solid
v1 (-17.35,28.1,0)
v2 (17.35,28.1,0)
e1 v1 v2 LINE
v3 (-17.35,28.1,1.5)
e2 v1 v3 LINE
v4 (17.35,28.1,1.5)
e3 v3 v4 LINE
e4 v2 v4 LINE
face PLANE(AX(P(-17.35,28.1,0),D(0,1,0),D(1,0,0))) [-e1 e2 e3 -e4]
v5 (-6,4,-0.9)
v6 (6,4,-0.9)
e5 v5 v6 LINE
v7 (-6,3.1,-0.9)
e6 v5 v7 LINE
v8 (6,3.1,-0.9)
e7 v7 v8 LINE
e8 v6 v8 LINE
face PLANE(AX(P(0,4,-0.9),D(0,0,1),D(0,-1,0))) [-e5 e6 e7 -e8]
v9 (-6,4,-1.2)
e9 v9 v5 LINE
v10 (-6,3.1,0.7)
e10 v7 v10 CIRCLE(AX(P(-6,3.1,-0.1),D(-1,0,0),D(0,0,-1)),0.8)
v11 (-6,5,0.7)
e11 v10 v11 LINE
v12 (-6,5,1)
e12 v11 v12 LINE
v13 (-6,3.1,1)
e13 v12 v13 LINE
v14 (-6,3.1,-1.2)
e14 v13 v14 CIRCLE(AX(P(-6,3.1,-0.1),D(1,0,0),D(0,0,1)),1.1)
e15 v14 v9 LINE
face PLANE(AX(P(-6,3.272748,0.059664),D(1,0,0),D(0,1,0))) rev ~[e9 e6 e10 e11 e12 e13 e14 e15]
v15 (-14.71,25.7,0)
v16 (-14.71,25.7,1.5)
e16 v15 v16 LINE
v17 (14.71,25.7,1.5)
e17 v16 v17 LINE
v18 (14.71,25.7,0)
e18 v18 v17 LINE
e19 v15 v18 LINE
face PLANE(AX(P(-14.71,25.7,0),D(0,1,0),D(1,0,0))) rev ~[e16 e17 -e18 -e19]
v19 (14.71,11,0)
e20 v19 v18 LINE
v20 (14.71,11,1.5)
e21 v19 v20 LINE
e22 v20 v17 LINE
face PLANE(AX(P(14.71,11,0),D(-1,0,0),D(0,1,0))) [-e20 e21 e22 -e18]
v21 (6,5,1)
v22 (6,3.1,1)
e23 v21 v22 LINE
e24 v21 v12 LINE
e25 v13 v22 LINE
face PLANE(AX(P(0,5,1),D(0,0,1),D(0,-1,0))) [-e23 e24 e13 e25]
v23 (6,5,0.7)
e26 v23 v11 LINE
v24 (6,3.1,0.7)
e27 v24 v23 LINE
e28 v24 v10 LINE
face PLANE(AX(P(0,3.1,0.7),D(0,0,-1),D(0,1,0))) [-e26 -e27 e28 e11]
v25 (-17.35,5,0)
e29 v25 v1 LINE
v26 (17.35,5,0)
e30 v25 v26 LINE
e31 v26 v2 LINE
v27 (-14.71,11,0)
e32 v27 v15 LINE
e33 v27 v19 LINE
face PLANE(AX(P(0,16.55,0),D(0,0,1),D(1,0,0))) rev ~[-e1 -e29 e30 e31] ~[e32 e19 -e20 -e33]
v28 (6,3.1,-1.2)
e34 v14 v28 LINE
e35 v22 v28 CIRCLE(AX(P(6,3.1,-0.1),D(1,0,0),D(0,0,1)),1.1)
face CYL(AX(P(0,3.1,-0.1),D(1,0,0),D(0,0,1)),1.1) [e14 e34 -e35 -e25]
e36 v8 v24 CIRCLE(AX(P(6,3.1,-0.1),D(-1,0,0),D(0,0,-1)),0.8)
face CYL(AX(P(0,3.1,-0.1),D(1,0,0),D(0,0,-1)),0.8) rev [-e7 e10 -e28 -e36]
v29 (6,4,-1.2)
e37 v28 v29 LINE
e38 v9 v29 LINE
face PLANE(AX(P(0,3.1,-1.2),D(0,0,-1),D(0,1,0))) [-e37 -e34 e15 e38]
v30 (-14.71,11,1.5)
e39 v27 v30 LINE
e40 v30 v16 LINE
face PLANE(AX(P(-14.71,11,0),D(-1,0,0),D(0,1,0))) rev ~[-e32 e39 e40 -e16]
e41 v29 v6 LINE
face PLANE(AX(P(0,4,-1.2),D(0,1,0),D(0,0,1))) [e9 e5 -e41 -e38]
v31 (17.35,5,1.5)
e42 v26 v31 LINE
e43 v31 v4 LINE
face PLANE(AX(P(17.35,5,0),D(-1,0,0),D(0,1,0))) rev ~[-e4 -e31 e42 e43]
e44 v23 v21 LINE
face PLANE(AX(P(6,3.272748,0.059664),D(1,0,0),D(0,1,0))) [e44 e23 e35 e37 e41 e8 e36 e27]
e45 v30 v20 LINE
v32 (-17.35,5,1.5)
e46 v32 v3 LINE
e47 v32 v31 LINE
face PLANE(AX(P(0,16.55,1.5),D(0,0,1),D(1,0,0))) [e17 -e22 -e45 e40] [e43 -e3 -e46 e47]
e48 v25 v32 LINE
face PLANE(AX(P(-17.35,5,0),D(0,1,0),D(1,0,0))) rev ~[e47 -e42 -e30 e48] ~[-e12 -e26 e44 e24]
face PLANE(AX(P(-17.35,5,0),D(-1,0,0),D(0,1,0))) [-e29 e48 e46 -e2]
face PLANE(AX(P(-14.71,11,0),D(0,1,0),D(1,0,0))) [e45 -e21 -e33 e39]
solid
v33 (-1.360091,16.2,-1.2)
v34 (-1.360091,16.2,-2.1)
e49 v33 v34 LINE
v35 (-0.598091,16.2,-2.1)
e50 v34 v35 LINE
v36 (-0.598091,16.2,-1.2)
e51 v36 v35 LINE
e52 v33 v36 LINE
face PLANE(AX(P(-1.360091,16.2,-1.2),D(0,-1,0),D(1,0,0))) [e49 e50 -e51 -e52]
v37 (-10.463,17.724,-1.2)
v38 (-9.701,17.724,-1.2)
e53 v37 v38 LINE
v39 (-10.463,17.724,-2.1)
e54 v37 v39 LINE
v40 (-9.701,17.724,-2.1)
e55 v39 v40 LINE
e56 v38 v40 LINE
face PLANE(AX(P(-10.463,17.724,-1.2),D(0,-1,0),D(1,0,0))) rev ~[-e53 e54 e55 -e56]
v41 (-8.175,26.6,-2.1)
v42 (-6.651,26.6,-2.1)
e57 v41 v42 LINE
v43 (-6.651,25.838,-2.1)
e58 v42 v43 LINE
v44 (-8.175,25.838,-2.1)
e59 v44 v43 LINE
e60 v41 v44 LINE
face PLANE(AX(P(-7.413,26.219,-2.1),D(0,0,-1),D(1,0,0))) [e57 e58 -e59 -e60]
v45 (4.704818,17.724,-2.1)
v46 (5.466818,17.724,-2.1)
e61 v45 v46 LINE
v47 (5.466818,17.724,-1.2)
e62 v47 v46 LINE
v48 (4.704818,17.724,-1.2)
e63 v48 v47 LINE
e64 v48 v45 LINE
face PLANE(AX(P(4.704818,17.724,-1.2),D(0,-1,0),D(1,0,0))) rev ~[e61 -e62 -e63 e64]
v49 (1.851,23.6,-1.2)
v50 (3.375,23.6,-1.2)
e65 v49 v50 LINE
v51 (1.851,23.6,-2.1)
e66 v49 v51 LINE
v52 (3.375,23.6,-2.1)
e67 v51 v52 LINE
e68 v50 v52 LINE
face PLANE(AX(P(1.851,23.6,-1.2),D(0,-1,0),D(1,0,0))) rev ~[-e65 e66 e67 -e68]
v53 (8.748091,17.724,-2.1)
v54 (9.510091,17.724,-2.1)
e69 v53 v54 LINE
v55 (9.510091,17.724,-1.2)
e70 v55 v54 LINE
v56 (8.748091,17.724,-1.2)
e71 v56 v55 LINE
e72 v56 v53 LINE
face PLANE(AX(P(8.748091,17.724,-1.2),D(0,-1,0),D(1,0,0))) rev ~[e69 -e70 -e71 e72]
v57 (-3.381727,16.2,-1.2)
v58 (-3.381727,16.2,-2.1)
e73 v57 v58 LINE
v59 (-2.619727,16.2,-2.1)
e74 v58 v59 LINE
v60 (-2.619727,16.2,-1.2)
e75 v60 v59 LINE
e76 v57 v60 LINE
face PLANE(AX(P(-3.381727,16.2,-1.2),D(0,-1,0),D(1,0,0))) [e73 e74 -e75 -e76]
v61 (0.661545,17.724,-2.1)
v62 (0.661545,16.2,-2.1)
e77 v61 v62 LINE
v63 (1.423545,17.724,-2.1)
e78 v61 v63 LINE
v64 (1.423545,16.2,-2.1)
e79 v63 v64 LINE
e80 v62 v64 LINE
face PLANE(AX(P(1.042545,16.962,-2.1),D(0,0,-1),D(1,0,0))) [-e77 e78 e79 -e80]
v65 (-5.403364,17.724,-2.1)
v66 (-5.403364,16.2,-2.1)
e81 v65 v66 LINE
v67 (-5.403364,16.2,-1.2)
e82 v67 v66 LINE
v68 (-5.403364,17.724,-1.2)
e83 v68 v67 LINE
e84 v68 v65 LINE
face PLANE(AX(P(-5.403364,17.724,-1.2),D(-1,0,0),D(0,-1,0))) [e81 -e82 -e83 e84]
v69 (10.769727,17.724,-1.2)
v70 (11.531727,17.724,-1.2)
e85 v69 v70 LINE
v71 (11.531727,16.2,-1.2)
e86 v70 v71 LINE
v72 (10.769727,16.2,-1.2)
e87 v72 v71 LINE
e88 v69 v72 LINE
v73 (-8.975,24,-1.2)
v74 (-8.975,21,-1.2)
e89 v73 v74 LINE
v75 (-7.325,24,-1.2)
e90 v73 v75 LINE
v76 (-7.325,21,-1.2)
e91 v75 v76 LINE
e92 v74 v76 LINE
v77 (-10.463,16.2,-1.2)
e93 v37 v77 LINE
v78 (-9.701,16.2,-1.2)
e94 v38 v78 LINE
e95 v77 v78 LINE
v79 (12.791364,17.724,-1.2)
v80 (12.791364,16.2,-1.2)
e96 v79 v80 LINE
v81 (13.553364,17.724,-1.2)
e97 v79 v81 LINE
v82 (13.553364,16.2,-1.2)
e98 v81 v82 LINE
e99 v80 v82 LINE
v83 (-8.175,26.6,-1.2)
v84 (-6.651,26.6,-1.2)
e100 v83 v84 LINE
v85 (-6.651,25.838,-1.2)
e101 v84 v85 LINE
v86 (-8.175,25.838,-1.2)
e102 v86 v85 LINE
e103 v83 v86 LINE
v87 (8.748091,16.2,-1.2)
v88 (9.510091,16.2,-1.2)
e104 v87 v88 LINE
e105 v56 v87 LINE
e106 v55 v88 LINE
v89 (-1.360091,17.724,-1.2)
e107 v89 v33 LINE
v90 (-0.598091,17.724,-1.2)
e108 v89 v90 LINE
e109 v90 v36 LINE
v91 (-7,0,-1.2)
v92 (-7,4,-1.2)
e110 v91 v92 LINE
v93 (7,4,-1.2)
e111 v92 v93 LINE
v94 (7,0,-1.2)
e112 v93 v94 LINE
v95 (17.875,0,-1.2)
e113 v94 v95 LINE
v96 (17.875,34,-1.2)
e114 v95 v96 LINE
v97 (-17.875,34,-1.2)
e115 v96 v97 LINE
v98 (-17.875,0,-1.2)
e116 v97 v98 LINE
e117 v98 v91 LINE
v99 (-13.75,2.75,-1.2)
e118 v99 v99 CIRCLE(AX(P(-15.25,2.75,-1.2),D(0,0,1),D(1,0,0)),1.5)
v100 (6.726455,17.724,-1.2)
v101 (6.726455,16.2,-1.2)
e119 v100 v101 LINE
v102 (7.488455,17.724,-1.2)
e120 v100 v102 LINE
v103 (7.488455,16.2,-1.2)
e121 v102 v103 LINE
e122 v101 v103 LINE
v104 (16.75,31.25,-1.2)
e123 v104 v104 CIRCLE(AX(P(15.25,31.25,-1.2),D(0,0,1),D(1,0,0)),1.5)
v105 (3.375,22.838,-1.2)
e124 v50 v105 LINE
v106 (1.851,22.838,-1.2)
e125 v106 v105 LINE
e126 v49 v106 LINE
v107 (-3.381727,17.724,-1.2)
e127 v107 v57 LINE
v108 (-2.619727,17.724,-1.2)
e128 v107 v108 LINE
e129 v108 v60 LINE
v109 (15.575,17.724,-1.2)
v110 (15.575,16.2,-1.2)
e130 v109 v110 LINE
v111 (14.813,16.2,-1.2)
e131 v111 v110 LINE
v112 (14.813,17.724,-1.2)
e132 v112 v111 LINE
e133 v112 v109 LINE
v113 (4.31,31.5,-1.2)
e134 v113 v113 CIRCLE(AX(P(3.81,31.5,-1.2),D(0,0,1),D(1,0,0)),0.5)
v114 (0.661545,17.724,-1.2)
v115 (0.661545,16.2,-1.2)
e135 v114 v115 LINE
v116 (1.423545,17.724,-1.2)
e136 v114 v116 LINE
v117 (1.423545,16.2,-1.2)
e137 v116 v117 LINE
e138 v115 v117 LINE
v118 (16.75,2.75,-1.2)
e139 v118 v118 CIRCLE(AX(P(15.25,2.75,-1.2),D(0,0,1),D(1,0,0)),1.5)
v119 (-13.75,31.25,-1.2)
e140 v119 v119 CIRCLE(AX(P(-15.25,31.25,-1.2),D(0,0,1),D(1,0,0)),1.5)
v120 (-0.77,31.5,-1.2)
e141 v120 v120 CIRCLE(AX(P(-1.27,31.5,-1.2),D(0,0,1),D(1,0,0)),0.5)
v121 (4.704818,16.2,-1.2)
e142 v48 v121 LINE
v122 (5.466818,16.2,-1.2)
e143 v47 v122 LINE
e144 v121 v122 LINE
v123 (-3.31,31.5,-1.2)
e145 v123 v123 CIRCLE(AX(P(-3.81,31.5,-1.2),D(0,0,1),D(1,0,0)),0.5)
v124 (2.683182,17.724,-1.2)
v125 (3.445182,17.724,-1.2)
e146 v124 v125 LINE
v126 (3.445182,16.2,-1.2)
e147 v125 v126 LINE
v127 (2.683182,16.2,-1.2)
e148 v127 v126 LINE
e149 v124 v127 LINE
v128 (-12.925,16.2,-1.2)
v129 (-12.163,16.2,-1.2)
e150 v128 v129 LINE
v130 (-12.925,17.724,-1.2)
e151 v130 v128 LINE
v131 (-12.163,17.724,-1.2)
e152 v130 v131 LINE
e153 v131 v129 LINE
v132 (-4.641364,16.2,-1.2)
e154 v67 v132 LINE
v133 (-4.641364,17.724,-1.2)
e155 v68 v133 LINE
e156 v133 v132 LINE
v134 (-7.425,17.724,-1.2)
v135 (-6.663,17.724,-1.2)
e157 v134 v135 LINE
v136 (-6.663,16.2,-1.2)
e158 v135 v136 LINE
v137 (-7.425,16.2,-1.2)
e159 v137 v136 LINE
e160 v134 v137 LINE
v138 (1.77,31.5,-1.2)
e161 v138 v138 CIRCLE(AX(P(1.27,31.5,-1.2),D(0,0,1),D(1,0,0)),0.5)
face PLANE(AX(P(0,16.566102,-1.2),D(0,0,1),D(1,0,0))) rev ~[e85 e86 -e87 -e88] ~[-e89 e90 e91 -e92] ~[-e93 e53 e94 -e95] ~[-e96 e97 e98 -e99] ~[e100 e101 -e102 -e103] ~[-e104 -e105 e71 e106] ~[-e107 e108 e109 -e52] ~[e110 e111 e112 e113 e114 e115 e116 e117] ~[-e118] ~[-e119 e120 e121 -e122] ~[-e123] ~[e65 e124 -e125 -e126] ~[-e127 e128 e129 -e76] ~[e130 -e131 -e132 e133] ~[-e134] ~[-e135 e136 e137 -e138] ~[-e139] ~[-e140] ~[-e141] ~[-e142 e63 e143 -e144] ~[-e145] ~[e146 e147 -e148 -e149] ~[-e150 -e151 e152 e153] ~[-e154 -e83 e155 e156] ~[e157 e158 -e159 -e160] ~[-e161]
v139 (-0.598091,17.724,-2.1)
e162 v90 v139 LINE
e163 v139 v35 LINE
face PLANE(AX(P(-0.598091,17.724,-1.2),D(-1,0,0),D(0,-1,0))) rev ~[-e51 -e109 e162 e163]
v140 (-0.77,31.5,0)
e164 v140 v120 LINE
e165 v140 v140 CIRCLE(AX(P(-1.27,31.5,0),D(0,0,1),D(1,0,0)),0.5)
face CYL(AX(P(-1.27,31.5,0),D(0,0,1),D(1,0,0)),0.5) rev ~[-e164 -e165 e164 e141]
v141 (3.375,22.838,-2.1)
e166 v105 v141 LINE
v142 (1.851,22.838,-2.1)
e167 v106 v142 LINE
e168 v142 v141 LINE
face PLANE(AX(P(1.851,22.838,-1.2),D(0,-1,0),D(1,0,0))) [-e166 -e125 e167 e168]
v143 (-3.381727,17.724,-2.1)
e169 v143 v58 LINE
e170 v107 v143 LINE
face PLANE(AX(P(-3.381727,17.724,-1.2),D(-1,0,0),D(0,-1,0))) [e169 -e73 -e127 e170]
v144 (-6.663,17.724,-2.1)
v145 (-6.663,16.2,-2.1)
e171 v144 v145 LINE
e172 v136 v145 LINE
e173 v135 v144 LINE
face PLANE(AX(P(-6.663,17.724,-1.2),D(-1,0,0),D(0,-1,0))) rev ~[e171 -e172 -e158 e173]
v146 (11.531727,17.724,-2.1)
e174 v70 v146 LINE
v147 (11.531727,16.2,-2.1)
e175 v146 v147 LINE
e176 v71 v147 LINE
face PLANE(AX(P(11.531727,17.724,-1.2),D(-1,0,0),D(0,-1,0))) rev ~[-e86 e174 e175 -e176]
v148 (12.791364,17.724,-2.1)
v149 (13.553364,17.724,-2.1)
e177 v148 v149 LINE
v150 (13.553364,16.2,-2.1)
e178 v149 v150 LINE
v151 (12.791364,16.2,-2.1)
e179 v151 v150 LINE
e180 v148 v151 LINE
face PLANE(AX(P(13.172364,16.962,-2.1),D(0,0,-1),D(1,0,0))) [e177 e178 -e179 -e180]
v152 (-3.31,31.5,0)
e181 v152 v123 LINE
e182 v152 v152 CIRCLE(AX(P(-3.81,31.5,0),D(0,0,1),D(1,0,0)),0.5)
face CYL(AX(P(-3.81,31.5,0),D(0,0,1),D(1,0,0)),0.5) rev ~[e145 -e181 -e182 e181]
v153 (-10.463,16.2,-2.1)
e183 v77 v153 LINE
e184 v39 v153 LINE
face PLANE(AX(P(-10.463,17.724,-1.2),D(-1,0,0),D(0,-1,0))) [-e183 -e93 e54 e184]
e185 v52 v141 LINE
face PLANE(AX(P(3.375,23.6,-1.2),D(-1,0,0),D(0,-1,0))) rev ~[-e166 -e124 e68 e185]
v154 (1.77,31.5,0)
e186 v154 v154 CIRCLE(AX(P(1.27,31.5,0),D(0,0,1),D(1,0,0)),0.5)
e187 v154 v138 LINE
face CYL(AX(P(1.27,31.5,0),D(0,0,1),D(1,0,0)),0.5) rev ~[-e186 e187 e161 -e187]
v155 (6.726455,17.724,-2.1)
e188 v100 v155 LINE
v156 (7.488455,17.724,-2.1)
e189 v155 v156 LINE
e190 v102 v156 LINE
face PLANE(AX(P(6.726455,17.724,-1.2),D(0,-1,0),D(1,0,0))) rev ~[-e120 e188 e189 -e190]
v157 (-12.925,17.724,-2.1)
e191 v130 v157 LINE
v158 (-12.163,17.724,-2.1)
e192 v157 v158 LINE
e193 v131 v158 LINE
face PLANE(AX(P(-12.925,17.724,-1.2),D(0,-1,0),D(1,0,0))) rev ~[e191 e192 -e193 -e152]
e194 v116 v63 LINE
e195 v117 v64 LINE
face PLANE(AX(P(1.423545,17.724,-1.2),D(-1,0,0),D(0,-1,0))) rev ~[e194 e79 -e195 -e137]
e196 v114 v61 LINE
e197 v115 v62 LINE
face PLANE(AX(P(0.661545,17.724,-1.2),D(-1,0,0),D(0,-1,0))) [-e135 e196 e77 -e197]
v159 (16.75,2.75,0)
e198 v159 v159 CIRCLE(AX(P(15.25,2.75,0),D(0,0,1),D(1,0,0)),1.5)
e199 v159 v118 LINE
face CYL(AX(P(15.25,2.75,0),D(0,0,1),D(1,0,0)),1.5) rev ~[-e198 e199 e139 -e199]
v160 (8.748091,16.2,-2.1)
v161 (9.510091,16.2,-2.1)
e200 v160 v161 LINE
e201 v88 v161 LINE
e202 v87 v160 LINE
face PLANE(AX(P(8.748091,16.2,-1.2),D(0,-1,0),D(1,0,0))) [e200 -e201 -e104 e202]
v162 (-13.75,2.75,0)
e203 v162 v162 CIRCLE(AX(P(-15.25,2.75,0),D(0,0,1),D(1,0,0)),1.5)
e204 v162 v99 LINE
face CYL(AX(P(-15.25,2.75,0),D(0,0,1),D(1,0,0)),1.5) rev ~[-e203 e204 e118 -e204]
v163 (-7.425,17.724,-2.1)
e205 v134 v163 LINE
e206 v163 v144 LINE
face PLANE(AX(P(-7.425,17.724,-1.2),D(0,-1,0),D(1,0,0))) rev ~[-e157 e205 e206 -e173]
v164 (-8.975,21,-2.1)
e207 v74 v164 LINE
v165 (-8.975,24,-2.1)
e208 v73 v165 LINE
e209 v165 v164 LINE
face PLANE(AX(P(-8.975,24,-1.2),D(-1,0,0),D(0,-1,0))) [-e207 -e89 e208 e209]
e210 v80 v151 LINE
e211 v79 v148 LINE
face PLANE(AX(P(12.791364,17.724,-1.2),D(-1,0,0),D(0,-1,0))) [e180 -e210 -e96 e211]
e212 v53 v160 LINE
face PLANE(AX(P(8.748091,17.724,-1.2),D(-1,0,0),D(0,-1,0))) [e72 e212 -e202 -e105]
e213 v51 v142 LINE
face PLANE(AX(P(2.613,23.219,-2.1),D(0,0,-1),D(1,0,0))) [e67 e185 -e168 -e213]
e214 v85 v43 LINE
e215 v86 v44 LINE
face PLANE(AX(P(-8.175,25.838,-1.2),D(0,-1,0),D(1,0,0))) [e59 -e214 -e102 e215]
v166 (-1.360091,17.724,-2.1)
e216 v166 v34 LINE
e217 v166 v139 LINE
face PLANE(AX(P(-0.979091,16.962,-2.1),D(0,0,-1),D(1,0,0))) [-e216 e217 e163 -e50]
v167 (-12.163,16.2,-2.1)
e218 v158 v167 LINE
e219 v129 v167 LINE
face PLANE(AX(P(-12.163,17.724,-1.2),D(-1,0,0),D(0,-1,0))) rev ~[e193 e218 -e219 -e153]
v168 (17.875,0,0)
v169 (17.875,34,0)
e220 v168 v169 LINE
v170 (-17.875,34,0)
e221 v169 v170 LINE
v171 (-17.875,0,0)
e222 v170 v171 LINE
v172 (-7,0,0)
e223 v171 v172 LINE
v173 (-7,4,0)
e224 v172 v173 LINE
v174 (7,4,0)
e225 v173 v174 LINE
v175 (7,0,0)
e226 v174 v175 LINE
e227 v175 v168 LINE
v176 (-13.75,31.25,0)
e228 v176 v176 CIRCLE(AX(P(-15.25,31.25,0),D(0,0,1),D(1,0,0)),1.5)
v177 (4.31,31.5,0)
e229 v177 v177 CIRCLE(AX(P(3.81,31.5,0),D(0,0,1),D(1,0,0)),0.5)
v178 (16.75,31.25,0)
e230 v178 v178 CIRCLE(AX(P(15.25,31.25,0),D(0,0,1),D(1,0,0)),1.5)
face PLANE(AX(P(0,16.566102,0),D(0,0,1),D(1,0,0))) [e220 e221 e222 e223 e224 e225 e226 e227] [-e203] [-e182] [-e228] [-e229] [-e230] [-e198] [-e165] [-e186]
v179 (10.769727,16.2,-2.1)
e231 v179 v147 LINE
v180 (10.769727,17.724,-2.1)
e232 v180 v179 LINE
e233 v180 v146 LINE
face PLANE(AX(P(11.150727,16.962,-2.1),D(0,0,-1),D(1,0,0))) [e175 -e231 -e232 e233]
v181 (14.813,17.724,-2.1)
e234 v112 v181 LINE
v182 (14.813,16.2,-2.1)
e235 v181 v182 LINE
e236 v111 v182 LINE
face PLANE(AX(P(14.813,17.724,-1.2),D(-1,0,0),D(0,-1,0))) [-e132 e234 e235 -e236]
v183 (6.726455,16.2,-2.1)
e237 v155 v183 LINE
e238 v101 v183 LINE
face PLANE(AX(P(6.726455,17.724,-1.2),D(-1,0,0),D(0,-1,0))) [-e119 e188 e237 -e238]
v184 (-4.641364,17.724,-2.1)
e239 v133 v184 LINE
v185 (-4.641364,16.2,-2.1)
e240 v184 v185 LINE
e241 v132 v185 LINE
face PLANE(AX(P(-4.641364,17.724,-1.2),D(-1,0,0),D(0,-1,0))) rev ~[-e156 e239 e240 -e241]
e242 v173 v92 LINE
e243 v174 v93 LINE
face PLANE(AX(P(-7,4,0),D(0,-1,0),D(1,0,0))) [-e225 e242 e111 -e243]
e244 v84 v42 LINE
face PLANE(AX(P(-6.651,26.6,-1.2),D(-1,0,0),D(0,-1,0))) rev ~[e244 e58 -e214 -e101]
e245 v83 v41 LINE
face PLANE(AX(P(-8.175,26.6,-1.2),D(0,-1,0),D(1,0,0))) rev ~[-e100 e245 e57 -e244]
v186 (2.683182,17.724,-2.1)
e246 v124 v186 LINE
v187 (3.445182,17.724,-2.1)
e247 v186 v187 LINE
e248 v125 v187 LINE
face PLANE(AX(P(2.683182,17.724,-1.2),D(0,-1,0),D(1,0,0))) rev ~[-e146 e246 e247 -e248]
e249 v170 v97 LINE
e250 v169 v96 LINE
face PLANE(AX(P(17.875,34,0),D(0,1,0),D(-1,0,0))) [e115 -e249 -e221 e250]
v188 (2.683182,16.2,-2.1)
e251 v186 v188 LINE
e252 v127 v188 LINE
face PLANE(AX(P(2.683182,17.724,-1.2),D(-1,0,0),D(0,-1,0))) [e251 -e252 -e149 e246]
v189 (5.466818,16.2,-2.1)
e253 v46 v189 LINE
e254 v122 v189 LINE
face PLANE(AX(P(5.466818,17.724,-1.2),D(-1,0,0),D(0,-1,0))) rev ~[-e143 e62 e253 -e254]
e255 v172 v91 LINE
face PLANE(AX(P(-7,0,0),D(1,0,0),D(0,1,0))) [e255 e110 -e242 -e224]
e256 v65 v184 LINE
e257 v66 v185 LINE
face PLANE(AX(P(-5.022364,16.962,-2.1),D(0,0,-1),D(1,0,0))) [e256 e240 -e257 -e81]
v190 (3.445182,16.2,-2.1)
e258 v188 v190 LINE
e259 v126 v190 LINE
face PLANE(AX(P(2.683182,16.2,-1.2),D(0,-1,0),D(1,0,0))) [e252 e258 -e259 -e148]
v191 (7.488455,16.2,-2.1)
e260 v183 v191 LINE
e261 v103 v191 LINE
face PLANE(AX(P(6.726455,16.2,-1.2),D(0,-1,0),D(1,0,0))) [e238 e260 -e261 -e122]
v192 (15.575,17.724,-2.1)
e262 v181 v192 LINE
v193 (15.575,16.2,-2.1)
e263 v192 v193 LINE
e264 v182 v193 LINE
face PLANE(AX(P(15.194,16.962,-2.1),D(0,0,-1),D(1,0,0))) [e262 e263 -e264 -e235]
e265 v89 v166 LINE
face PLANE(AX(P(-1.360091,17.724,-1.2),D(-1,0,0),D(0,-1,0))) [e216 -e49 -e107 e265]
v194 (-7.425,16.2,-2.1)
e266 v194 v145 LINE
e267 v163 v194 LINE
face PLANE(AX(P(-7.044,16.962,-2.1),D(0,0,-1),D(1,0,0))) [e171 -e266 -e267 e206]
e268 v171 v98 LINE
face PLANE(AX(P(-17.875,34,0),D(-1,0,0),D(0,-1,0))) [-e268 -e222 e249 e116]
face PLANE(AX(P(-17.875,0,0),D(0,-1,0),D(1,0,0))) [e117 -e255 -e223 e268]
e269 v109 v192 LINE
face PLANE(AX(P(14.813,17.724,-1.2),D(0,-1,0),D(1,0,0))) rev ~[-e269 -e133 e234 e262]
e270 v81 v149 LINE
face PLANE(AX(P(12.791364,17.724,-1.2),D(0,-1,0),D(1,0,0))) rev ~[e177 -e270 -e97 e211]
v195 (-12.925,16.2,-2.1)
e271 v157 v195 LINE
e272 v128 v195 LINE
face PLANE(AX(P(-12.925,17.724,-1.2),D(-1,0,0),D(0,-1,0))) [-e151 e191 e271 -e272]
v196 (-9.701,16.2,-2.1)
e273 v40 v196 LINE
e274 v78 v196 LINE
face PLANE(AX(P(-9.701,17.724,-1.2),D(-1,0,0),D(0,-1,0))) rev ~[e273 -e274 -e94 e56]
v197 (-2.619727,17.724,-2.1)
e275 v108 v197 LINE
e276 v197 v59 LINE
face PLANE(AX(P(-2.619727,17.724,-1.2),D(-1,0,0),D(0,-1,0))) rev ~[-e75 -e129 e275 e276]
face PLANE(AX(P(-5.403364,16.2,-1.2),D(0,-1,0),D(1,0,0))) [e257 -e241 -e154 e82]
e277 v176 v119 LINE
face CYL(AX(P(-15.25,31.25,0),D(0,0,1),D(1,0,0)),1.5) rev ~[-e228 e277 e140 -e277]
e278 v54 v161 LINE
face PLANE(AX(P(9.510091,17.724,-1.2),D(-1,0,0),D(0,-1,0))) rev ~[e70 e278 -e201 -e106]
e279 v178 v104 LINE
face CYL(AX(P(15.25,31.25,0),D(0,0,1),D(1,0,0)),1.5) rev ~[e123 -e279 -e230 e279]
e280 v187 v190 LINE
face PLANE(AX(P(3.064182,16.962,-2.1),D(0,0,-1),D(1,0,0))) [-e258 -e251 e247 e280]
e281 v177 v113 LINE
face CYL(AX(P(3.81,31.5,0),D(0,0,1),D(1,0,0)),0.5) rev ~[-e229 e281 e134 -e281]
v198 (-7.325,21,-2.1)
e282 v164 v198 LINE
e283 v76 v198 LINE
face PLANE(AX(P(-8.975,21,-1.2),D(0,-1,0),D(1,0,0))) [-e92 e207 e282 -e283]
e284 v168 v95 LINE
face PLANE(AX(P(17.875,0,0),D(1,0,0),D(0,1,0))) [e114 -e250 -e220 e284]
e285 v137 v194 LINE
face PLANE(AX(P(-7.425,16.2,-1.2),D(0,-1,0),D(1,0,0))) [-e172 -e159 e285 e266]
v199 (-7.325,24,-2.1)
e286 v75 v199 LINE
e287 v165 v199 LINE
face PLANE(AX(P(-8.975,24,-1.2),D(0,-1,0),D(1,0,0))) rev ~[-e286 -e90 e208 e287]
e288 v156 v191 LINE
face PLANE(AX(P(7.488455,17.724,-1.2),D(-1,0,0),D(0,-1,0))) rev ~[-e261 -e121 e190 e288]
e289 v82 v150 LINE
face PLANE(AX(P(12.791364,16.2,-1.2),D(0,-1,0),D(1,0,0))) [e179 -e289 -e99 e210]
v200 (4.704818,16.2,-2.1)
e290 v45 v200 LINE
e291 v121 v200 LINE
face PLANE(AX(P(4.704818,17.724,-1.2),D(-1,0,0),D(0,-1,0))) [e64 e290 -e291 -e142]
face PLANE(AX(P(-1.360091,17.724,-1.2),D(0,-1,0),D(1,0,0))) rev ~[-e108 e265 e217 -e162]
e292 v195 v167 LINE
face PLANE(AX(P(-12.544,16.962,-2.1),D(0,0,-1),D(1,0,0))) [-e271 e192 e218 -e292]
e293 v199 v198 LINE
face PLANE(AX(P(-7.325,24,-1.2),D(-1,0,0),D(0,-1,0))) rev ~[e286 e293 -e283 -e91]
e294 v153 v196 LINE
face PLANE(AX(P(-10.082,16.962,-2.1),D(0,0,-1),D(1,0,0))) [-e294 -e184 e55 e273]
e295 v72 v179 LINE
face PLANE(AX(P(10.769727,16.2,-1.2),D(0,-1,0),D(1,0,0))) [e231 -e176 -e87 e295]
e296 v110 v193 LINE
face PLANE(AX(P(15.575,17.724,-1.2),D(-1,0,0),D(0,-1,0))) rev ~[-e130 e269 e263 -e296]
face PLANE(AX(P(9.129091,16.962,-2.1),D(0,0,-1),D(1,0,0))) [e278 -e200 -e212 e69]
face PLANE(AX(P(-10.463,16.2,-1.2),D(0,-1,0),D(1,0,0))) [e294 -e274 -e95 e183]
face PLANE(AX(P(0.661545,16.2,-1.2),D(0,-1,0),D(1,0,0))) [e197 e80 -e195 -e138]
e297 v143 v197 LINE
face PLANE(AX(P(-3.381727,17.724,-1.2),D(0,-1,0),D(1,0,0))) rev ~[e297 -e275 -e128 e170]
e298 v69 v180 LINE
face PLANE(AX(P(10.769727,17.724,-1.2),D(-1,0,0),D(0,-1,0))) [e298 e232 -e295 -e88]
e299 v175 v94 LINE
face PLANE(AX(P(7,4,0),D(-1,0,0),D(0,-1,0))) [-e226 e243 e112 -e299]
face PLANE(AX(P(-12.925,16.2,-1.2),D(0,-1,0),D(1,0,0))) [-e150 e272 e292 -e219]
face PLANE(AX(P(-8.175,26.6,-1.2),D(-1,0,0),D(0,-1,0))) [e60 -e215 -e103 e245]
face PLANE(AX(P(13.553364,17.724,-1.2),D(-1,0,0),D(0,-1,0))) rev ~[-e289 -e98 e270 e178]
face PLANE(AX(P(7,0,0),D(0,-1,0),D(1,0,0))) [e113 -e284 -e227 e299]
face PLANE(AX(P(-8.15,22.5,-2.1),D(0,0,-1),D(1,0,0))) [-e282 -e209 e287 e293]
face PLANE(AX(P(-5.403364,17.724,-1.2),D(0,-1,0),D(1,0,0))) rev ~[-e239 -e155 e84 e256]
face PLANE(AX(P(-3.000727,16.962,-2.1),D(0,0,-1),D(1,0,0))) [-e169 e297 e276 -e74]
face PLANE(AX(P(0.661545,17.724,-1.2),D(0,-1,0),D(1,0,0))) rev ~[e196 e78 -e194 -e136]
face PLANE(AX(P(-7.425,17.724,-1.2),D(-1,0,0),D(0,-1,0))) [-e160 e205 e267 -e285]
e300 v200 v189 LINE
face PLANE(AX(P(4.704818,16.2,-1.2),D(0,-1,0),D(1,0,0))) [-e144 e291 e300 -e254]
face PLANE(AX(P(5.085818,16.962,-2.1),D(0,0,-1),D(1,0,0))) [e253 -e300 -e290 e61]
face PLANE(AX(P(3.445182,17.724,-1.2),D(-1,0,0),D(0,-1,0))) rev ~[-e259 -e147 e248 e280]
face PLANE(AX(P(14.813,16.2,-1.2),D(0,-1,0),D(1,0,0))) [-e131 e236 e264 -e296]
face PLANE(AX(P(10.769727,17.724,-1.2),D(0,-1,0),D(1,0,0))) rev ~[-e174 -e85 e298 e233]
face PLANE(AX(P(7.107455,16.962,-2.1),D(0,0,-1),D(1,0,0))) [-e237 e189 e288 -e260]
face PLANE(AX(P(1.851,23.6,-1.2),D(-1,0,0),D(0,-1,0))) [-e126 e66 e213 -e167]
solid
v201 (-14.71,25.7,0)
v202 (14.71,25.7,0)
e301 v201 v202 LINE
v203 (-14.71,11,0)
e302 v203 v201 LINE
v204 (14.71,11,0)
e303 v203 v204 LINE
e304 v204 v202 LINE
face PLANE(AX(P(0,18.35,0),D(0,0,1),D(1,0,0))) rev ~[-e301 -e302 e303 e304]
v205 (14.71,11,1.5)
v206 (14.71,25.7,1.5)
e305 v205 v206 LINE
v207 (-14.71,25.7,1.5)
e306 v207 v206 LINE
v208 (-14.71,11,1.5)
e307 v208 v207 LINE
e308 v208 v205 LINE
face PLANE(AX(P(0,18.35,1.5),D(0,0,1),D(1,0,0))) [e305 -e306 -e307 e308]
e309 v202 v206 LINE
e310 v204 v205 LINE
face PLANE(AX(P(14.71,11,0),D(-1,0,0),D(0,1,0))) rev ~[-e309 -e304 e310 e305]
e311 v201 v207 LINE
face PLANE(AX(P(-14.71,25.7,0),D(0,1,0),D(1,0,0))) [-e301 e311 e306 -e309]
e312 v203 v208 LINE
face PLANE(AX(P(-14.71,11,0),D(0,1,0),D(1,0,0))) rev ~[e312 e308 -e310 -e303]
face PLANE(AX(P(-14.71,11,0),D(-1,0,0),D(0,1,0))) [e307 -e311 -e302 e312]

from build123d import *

# Parameters (mm, degrees)
F0_R     = 1.5
F0_R_2   = 0.5
F1_DEPTH = 1.2
F2_W     = 34.7
F2_H     = 23.1
F2_W_2   = 29.42
F2_H_2   = 14.7
F3_DEPTH = 1.5
F4_DEPTH = 1.5
F6_DEPTH = 6
F7_W     = 0.762
F7_H     = 1.524
F7_W_2   = 1.65
F7_H_2   = 3
F7_W_3   = 1.524
F7_H_3   = 0.762
F8_DEPTH = 0.9


with BuildPart() as f1:
    # F0 (on Top) → F1 (new body)
    with BuildSketch(Plane.XY):
        Polygon((17.875, 0), (17.875, 34), (-17.875, 34), (-17.875, 0), (-7, 0), (-7, 4), (7, 4), (7, 0), align=None)
        with Locations((-15.25, 2.75)):
            Circle(F0_R, mode=Mode.SUBTRACT)
        with Locations((15.25, 2.75)):
            Circle(F0_R, mode=Mode.SUBTRACT)
        with Locations((-15.25, 31.25)):
            Circle(F0_R, mode=Mode.SUBTRACT)
        with Locations((-3.81, 31.5)):
            Circle(F0_R_2, mode=Mode.SUBTRACT)
        with Locations((-1.27, 31.5)):
            Circle(F0_R_2, mode=Mode.SUBTRACT)
        with Locations((1.27, 31.5)):
            Circle(F0_R_2, mode=Mode.SUBTRACT)
        with Locations((3.81, 31.5)):
            Circle(F0_R_2, mode=Mode.SUBTRACT)
        with Locations((15.25, 31.25)):
            Circle(F0_R, mode=Mode.SUBTRACT)
    extrude(amount=-F1_DEPTH)

    # F7 (on face) → F8 (join)
    with BuildSketch(Plane(origin=(0, 0, -1.2), x_dir=(1, 0, 0), z_dir=(0, 0, -1))):
        with Locations((15.194, -16.962)):
            Rectangle(F7_W, F7_H)
        with Locations((13.1723636364, -16.962)):
            Rectangle(F7_W, F7_H)
        with Locations((11.1507272727, -16.962)):
            Rectangle(F7_W, F7_H)
        with Locations((9.1290909091, -16.962)):
            Rectangle(F7_W, F7_H)
        with Locations((7.1074545455, -16.962)):
            Rectangle(F7_W, F7_H)
        with Locations((5.0858181818, -16.962)):
            Rectangle(F7_W, F7_H)
        with Locations((3.0641818182, -16.962)):
            Rectangle(F7_W, F7_H)
        with Locations((1.0425454545, -16.962)):
            Rectangle(F7_W, F7_H)
        with Locations((-0.9790909091, -16.962)):
            Rectangle(F7_W, F7_H)
        with Locations((-3.0007272727, -16.962)):
            Rectangle(F7_W, F7_H)
        with Locations((-5.0223636364, -16.962)):
            Rectangle(F7_W, F7_H)
        with Locations((-7.044, -16.962)):
            Rectangle(F7_W, F7_H)
        with Locations((-10.082, -16.962)):
            Rectangle(F7_W, F7_H)
        with Locations((-12.544, -16.962)):
            Rectangle(F7_W, F7_H)
        with Locations((-8.15, -22.5)):
            Rectangle(F7_W_2, F7_H_2)
        with Locations((-7.413, -26.219)):
            Rectangle(F7_W_3, F7_H_3)
        with Locations((2.613, -23.219)):
            Rectangle(F7_W_3, F7_H_3)
    extrude(amount=F8_DEPTH)


with BuildPart() as f3:
    # F2 (on Top) → F3 (new body)
    with BuildSketch(Plane.XY):
        with Locations((0, 16.55)):
            Rectangle(F2_W, F2_H)
        with Locations((0, 18.35)):
            Rectangle(F2_W_2, F2_H_2, mode=Mode.SUBTRACT)
    extrude(amount=F3_DEPTH)

    # F5 (on Right) → F6 (join, symmetric)
    with BuildSketch(Plane.YZ):
        with BuildLine():
            Line((5, 1), (3.1, 1))
            ThreePointArc((3.1, 1), (2, -0.1), (3.1, -1.2))
            Line((3.1, -1.2), (4, -1.2))
            Line((4, -1.2), (4, -0.9))
            Line((4, -0.9), (3.1, -0.9))
            ThreePointArc((3.1, -0.9), (2.3, -0.1), (3.1, 0.7))
            Line((3.1, 0.7), (5, 0.7))
            Line((5, 0.7), (5, 1))
        make_face()
    extrude(amount=F6_DEPTH, both=True)


with BuildPart() as f4:
    # F2 (on Top) → F4 (new body, through all)
    with BuildSketch(Plane.XY):
        with Locations((0, 18.35)):
            Rectangle(F2_W_2, F2_H_2)
    extrude(amount=F4_DEPTH)


solid = Compound([f1.part, f3.part, f4.part])
